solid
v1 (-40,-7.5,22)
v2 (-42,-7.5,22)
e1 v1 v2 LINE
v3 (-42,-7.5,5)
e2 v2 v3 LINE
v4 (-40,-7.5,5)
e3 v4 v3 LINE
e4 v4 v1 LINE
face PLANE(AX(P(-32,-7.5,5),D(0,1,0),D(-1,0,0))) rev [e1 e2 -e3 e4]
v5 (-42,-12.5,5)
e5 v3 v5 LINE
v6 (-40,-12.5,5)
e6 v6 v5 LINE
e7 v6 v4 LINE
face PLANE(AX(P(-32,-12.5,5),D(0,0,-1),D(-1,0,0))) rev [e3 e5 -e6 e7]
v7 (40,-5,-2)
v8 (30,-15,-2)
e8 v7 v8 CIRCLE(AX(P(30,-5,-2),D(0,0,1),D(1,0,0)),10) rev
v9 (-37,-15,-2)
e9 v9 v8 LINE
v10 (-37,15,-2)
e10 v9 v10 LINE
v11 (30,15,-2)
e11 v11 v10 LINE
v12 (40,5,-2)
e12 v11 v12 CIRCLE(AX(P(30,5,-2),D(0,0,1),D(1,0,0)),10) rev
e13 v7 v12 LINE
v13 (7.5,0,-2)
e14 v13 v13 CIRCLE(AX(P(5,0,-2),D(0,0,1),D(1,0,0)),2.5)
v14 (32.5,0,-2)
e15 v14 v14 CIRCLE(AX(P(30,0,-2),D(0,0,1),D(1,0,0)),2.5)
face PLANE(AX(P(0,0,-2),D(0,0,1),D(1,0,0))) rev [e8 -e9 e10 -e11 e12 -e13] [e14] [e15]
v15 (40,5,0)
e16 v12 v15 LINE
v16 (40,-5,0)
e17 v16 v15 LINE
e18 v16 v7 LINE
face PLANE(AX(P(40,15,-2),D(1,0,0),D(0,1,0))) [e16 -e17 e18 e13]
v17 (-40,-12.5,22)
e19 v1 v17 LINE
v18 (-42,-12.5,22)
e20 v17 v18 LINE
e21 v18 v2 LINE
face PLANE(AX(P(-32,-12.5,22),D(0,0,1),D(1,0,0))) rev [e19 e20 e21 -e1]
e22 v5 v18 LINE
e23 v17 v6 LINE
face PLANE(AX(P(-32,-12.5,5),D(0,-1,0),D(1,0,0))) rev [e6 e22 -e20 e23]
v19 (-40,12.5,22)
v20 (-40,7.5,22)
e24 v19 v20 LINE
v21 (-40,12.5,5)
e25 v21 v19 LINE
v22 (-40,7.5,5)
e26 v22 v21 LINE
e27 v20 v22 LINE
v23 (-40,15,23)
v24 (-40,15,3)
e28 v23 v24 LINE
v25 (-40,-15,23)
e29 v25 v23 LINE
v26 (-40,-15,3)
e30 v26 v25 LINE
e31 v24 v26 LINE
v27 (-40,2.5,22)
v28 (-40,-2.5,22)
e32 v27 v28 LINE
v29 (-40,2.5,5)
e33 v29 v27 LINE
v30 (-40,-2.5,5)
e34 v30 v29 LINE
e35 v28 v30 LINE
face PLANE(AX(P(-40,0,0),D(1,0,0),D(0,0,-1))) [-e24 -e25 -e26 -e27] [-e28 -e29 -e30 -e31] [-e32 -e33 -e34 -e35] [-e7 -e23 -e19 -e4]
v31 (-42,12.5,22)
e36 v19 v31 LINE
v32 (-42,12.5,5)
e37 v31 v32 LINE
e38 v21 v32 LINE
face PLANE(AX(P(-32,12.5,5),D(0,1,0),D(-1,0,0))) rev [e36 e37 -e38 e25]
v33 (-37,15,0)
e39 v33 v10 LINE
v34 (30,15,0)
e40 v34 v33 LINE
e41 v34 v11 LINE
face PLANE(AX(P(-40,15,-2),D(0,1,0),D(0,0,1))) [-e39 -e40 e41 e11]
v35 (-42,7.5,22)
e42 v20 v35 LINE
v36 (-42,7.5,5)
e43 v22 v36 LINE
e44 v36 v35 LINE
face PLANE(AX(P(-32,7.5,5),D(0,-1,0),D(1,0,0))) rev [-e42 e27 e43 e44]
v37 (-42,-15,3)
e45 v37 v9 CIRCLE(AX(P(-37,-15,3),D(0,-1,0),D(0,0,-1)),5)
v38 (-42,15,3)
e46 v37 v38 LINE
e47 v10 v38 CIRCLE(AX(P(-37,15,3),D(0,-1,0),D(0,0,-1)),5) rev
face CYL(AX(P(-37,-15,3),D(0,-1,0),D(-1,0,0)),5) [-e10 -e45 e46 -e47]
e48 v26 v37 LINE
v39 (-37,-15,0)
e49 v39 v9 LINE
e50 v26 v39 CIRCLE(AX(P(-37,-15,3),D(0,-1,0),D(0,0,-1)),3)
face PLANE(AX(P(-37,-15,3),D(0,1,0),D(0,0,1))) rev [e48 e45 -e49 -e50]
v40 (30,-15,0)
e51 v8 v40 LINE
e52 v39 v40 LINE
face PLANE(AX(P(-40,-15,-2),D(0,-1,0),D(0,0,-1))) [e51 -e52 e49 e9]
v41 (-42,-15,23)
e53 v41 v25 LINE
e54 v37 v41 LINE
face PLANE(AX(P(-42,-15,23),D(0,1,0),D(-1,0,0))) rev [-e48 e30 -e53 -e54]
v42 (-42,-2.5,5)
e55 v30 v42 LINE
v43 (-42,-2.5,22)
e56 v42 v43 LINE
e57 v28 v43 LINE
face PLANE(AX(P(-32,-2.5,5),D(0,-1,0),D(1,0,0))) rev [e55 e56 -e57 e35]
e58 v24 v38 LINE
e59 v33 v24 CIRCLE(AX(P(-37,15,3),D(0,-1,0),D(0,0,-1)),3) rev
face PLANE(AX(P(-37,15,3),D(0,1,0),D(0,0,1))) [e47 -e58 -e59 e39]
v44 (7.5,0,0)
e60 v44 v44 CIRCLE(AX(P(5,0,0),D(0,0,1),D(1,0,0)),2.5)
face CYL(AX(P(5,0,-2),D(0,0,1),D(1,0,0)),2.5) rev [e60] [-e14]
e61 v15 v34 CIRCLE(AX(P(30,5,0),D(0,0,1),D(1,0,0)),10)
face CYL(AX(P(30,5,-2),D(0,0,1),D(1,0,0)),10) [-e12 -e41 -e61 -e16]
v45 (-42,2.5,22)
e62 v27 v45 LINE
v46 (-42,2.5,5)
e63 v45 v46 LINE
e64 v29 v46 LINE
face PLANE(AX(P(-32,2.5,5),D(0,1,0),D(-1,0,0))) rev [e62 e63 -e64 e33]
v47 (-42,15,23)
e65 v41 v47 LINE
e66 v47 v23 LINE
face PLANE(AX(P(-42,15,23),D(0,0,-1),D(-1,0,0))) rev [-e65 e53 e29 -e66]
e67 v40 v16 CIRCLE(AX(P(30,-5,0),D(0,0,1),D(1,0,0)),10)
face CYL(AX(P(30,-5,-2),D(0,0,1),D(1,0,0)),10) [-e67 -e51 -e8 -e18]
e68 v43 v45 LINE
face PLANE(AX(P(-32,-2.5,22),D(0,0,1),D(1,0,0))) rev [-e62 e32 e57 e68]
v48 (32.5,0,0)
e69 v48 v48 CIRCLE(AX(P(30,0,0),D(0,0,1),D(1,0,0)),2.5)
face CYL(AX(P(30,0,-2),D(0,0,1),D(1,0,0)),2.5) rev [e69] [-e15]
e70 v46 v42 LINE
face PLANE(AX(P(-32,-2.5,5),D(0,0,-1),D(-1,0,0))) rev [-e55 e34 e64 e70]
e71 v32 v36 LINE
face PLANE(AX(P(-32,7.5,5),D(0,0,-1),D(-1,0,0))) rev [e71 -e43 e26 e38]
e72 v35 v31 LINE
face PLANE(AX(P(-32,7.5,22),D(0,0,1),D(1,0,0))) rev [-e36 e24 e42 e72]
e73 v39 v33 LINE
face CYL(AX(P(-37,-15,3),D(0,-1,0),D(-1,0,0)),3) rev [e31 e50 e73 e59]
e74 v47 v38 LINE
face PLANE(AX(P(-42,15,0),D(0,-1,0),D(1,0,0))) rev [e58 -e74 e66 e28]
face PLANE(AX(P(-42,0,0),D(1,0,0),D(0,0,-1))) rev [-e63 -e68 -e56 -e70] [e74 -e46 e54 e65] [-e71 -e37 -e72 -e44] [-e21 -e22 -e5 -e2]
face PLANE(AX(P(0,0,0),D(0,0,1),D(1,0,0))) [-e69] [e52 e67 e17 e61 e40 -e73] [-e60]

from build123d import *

# Parameters (mm, degrees)
SKETCH1_W                    = 80
SKETCH1_H                    = 30
SKETCH1_R                    = 2.5
BASE_FLANGE1_DEPTH           = 2
FILLET1_R                    = 10
EDGE_FLANGE1_STRIP_W         = 14
EDGE_FLANGE1_STRIP_H         = 2
EDGE_FLANGE1_STRIP_CUT_DEPTH = 30
EDGE_FLANGE1_DEPTH           = 30
SKETCH9_W                    = 17
SKETCH9_H                    = 5
CUT_EXTRUDE1_DEPTH           = 10


# Sheet-metal steps are written as plain solids
with BuildPart() as part:
    # Sketch1 → Base-Flange1 (new body)
    with BuildSketch(Plane.XY):
        Rectangle(SKETCH1_W, SKETCH1_H)
        with Locations((30, 0)):
            Circle(SKETCH1_R, mode=Mode.SUBTRACT)
        with Locations((5, 0)):
            Circle(SKETCH1_R, mode=Mode.SUBTRACT)
    extrude(amount=-BASE_FLANGE1_DEPTH)

    # Fillet1
    fillet1_edges = [part.edges().sort_by_distance(p)[0] for p in [
        (40, -15, -1),
        (40, 15, -1),
    ]]
    fillet(fillet1_edges, radius=FILLET1_R)

    # Edge-Flange1 strip (across the edge) → Edge-Flange1 strip cut (cut)
    with BuildSketch(Plane(origin=(-40, 15, 0), x_dir=(1, 0, 0), z_dir=(0, -1, 0))):
        with Locations((-4, -1)):
            Rectangle(EDGE_FLANGE1_STRIP_W, EDGE_FLANGE1_STRIP_H)
    extrude(amount=EDGE_FLANGE1_STRIP_CUT_DEPTH, mode=Mode.SUBTRACT)

    # Edge-Flange1 section (across the edge) → Edge-Flange1 (add)
    with BuildSketch(Plane(origin=(-40, 15, 0), x_dir=(1, 0, 0), z_dir=(0, -1, 0))):
        with BuildLine():
            Line((-2, 3), (-2, 23))
            Line((-2, 23), (0, 23))
            Line((0, 23), (0, 3))
            ThreePointArc((0, 3), (0.878679656, 0.878679656), (3, 0))
            Line((3, 0), (3, -2))
            ThreePointArc((3, -2), (-0.535533906, -0.535533906), (-2, 3))
        make_face()
    extrude(amount=EDGE_FLANGE1_DEPTH)

    # Sketch9 → Cut-Extrude1 (cut)
    with BuildSketch(Plane.ZY.offset(42)):
        with Locations((13.5, 10)):
            Rectangle(SKETCH9_W, SKETCH9_H)
        with Locations((13.5, 0)):
            Rectangle(SKETCH9_W, SKETCH9_H)
        with Locations((13.5, -10)):
            Rectangle(SKETCH9_W, SKETCH9_H)
    extrude(amount=-CUT_EXTRUDE1_DEPTH, mode=Mode.SUBTRACT)


solid = part.part
